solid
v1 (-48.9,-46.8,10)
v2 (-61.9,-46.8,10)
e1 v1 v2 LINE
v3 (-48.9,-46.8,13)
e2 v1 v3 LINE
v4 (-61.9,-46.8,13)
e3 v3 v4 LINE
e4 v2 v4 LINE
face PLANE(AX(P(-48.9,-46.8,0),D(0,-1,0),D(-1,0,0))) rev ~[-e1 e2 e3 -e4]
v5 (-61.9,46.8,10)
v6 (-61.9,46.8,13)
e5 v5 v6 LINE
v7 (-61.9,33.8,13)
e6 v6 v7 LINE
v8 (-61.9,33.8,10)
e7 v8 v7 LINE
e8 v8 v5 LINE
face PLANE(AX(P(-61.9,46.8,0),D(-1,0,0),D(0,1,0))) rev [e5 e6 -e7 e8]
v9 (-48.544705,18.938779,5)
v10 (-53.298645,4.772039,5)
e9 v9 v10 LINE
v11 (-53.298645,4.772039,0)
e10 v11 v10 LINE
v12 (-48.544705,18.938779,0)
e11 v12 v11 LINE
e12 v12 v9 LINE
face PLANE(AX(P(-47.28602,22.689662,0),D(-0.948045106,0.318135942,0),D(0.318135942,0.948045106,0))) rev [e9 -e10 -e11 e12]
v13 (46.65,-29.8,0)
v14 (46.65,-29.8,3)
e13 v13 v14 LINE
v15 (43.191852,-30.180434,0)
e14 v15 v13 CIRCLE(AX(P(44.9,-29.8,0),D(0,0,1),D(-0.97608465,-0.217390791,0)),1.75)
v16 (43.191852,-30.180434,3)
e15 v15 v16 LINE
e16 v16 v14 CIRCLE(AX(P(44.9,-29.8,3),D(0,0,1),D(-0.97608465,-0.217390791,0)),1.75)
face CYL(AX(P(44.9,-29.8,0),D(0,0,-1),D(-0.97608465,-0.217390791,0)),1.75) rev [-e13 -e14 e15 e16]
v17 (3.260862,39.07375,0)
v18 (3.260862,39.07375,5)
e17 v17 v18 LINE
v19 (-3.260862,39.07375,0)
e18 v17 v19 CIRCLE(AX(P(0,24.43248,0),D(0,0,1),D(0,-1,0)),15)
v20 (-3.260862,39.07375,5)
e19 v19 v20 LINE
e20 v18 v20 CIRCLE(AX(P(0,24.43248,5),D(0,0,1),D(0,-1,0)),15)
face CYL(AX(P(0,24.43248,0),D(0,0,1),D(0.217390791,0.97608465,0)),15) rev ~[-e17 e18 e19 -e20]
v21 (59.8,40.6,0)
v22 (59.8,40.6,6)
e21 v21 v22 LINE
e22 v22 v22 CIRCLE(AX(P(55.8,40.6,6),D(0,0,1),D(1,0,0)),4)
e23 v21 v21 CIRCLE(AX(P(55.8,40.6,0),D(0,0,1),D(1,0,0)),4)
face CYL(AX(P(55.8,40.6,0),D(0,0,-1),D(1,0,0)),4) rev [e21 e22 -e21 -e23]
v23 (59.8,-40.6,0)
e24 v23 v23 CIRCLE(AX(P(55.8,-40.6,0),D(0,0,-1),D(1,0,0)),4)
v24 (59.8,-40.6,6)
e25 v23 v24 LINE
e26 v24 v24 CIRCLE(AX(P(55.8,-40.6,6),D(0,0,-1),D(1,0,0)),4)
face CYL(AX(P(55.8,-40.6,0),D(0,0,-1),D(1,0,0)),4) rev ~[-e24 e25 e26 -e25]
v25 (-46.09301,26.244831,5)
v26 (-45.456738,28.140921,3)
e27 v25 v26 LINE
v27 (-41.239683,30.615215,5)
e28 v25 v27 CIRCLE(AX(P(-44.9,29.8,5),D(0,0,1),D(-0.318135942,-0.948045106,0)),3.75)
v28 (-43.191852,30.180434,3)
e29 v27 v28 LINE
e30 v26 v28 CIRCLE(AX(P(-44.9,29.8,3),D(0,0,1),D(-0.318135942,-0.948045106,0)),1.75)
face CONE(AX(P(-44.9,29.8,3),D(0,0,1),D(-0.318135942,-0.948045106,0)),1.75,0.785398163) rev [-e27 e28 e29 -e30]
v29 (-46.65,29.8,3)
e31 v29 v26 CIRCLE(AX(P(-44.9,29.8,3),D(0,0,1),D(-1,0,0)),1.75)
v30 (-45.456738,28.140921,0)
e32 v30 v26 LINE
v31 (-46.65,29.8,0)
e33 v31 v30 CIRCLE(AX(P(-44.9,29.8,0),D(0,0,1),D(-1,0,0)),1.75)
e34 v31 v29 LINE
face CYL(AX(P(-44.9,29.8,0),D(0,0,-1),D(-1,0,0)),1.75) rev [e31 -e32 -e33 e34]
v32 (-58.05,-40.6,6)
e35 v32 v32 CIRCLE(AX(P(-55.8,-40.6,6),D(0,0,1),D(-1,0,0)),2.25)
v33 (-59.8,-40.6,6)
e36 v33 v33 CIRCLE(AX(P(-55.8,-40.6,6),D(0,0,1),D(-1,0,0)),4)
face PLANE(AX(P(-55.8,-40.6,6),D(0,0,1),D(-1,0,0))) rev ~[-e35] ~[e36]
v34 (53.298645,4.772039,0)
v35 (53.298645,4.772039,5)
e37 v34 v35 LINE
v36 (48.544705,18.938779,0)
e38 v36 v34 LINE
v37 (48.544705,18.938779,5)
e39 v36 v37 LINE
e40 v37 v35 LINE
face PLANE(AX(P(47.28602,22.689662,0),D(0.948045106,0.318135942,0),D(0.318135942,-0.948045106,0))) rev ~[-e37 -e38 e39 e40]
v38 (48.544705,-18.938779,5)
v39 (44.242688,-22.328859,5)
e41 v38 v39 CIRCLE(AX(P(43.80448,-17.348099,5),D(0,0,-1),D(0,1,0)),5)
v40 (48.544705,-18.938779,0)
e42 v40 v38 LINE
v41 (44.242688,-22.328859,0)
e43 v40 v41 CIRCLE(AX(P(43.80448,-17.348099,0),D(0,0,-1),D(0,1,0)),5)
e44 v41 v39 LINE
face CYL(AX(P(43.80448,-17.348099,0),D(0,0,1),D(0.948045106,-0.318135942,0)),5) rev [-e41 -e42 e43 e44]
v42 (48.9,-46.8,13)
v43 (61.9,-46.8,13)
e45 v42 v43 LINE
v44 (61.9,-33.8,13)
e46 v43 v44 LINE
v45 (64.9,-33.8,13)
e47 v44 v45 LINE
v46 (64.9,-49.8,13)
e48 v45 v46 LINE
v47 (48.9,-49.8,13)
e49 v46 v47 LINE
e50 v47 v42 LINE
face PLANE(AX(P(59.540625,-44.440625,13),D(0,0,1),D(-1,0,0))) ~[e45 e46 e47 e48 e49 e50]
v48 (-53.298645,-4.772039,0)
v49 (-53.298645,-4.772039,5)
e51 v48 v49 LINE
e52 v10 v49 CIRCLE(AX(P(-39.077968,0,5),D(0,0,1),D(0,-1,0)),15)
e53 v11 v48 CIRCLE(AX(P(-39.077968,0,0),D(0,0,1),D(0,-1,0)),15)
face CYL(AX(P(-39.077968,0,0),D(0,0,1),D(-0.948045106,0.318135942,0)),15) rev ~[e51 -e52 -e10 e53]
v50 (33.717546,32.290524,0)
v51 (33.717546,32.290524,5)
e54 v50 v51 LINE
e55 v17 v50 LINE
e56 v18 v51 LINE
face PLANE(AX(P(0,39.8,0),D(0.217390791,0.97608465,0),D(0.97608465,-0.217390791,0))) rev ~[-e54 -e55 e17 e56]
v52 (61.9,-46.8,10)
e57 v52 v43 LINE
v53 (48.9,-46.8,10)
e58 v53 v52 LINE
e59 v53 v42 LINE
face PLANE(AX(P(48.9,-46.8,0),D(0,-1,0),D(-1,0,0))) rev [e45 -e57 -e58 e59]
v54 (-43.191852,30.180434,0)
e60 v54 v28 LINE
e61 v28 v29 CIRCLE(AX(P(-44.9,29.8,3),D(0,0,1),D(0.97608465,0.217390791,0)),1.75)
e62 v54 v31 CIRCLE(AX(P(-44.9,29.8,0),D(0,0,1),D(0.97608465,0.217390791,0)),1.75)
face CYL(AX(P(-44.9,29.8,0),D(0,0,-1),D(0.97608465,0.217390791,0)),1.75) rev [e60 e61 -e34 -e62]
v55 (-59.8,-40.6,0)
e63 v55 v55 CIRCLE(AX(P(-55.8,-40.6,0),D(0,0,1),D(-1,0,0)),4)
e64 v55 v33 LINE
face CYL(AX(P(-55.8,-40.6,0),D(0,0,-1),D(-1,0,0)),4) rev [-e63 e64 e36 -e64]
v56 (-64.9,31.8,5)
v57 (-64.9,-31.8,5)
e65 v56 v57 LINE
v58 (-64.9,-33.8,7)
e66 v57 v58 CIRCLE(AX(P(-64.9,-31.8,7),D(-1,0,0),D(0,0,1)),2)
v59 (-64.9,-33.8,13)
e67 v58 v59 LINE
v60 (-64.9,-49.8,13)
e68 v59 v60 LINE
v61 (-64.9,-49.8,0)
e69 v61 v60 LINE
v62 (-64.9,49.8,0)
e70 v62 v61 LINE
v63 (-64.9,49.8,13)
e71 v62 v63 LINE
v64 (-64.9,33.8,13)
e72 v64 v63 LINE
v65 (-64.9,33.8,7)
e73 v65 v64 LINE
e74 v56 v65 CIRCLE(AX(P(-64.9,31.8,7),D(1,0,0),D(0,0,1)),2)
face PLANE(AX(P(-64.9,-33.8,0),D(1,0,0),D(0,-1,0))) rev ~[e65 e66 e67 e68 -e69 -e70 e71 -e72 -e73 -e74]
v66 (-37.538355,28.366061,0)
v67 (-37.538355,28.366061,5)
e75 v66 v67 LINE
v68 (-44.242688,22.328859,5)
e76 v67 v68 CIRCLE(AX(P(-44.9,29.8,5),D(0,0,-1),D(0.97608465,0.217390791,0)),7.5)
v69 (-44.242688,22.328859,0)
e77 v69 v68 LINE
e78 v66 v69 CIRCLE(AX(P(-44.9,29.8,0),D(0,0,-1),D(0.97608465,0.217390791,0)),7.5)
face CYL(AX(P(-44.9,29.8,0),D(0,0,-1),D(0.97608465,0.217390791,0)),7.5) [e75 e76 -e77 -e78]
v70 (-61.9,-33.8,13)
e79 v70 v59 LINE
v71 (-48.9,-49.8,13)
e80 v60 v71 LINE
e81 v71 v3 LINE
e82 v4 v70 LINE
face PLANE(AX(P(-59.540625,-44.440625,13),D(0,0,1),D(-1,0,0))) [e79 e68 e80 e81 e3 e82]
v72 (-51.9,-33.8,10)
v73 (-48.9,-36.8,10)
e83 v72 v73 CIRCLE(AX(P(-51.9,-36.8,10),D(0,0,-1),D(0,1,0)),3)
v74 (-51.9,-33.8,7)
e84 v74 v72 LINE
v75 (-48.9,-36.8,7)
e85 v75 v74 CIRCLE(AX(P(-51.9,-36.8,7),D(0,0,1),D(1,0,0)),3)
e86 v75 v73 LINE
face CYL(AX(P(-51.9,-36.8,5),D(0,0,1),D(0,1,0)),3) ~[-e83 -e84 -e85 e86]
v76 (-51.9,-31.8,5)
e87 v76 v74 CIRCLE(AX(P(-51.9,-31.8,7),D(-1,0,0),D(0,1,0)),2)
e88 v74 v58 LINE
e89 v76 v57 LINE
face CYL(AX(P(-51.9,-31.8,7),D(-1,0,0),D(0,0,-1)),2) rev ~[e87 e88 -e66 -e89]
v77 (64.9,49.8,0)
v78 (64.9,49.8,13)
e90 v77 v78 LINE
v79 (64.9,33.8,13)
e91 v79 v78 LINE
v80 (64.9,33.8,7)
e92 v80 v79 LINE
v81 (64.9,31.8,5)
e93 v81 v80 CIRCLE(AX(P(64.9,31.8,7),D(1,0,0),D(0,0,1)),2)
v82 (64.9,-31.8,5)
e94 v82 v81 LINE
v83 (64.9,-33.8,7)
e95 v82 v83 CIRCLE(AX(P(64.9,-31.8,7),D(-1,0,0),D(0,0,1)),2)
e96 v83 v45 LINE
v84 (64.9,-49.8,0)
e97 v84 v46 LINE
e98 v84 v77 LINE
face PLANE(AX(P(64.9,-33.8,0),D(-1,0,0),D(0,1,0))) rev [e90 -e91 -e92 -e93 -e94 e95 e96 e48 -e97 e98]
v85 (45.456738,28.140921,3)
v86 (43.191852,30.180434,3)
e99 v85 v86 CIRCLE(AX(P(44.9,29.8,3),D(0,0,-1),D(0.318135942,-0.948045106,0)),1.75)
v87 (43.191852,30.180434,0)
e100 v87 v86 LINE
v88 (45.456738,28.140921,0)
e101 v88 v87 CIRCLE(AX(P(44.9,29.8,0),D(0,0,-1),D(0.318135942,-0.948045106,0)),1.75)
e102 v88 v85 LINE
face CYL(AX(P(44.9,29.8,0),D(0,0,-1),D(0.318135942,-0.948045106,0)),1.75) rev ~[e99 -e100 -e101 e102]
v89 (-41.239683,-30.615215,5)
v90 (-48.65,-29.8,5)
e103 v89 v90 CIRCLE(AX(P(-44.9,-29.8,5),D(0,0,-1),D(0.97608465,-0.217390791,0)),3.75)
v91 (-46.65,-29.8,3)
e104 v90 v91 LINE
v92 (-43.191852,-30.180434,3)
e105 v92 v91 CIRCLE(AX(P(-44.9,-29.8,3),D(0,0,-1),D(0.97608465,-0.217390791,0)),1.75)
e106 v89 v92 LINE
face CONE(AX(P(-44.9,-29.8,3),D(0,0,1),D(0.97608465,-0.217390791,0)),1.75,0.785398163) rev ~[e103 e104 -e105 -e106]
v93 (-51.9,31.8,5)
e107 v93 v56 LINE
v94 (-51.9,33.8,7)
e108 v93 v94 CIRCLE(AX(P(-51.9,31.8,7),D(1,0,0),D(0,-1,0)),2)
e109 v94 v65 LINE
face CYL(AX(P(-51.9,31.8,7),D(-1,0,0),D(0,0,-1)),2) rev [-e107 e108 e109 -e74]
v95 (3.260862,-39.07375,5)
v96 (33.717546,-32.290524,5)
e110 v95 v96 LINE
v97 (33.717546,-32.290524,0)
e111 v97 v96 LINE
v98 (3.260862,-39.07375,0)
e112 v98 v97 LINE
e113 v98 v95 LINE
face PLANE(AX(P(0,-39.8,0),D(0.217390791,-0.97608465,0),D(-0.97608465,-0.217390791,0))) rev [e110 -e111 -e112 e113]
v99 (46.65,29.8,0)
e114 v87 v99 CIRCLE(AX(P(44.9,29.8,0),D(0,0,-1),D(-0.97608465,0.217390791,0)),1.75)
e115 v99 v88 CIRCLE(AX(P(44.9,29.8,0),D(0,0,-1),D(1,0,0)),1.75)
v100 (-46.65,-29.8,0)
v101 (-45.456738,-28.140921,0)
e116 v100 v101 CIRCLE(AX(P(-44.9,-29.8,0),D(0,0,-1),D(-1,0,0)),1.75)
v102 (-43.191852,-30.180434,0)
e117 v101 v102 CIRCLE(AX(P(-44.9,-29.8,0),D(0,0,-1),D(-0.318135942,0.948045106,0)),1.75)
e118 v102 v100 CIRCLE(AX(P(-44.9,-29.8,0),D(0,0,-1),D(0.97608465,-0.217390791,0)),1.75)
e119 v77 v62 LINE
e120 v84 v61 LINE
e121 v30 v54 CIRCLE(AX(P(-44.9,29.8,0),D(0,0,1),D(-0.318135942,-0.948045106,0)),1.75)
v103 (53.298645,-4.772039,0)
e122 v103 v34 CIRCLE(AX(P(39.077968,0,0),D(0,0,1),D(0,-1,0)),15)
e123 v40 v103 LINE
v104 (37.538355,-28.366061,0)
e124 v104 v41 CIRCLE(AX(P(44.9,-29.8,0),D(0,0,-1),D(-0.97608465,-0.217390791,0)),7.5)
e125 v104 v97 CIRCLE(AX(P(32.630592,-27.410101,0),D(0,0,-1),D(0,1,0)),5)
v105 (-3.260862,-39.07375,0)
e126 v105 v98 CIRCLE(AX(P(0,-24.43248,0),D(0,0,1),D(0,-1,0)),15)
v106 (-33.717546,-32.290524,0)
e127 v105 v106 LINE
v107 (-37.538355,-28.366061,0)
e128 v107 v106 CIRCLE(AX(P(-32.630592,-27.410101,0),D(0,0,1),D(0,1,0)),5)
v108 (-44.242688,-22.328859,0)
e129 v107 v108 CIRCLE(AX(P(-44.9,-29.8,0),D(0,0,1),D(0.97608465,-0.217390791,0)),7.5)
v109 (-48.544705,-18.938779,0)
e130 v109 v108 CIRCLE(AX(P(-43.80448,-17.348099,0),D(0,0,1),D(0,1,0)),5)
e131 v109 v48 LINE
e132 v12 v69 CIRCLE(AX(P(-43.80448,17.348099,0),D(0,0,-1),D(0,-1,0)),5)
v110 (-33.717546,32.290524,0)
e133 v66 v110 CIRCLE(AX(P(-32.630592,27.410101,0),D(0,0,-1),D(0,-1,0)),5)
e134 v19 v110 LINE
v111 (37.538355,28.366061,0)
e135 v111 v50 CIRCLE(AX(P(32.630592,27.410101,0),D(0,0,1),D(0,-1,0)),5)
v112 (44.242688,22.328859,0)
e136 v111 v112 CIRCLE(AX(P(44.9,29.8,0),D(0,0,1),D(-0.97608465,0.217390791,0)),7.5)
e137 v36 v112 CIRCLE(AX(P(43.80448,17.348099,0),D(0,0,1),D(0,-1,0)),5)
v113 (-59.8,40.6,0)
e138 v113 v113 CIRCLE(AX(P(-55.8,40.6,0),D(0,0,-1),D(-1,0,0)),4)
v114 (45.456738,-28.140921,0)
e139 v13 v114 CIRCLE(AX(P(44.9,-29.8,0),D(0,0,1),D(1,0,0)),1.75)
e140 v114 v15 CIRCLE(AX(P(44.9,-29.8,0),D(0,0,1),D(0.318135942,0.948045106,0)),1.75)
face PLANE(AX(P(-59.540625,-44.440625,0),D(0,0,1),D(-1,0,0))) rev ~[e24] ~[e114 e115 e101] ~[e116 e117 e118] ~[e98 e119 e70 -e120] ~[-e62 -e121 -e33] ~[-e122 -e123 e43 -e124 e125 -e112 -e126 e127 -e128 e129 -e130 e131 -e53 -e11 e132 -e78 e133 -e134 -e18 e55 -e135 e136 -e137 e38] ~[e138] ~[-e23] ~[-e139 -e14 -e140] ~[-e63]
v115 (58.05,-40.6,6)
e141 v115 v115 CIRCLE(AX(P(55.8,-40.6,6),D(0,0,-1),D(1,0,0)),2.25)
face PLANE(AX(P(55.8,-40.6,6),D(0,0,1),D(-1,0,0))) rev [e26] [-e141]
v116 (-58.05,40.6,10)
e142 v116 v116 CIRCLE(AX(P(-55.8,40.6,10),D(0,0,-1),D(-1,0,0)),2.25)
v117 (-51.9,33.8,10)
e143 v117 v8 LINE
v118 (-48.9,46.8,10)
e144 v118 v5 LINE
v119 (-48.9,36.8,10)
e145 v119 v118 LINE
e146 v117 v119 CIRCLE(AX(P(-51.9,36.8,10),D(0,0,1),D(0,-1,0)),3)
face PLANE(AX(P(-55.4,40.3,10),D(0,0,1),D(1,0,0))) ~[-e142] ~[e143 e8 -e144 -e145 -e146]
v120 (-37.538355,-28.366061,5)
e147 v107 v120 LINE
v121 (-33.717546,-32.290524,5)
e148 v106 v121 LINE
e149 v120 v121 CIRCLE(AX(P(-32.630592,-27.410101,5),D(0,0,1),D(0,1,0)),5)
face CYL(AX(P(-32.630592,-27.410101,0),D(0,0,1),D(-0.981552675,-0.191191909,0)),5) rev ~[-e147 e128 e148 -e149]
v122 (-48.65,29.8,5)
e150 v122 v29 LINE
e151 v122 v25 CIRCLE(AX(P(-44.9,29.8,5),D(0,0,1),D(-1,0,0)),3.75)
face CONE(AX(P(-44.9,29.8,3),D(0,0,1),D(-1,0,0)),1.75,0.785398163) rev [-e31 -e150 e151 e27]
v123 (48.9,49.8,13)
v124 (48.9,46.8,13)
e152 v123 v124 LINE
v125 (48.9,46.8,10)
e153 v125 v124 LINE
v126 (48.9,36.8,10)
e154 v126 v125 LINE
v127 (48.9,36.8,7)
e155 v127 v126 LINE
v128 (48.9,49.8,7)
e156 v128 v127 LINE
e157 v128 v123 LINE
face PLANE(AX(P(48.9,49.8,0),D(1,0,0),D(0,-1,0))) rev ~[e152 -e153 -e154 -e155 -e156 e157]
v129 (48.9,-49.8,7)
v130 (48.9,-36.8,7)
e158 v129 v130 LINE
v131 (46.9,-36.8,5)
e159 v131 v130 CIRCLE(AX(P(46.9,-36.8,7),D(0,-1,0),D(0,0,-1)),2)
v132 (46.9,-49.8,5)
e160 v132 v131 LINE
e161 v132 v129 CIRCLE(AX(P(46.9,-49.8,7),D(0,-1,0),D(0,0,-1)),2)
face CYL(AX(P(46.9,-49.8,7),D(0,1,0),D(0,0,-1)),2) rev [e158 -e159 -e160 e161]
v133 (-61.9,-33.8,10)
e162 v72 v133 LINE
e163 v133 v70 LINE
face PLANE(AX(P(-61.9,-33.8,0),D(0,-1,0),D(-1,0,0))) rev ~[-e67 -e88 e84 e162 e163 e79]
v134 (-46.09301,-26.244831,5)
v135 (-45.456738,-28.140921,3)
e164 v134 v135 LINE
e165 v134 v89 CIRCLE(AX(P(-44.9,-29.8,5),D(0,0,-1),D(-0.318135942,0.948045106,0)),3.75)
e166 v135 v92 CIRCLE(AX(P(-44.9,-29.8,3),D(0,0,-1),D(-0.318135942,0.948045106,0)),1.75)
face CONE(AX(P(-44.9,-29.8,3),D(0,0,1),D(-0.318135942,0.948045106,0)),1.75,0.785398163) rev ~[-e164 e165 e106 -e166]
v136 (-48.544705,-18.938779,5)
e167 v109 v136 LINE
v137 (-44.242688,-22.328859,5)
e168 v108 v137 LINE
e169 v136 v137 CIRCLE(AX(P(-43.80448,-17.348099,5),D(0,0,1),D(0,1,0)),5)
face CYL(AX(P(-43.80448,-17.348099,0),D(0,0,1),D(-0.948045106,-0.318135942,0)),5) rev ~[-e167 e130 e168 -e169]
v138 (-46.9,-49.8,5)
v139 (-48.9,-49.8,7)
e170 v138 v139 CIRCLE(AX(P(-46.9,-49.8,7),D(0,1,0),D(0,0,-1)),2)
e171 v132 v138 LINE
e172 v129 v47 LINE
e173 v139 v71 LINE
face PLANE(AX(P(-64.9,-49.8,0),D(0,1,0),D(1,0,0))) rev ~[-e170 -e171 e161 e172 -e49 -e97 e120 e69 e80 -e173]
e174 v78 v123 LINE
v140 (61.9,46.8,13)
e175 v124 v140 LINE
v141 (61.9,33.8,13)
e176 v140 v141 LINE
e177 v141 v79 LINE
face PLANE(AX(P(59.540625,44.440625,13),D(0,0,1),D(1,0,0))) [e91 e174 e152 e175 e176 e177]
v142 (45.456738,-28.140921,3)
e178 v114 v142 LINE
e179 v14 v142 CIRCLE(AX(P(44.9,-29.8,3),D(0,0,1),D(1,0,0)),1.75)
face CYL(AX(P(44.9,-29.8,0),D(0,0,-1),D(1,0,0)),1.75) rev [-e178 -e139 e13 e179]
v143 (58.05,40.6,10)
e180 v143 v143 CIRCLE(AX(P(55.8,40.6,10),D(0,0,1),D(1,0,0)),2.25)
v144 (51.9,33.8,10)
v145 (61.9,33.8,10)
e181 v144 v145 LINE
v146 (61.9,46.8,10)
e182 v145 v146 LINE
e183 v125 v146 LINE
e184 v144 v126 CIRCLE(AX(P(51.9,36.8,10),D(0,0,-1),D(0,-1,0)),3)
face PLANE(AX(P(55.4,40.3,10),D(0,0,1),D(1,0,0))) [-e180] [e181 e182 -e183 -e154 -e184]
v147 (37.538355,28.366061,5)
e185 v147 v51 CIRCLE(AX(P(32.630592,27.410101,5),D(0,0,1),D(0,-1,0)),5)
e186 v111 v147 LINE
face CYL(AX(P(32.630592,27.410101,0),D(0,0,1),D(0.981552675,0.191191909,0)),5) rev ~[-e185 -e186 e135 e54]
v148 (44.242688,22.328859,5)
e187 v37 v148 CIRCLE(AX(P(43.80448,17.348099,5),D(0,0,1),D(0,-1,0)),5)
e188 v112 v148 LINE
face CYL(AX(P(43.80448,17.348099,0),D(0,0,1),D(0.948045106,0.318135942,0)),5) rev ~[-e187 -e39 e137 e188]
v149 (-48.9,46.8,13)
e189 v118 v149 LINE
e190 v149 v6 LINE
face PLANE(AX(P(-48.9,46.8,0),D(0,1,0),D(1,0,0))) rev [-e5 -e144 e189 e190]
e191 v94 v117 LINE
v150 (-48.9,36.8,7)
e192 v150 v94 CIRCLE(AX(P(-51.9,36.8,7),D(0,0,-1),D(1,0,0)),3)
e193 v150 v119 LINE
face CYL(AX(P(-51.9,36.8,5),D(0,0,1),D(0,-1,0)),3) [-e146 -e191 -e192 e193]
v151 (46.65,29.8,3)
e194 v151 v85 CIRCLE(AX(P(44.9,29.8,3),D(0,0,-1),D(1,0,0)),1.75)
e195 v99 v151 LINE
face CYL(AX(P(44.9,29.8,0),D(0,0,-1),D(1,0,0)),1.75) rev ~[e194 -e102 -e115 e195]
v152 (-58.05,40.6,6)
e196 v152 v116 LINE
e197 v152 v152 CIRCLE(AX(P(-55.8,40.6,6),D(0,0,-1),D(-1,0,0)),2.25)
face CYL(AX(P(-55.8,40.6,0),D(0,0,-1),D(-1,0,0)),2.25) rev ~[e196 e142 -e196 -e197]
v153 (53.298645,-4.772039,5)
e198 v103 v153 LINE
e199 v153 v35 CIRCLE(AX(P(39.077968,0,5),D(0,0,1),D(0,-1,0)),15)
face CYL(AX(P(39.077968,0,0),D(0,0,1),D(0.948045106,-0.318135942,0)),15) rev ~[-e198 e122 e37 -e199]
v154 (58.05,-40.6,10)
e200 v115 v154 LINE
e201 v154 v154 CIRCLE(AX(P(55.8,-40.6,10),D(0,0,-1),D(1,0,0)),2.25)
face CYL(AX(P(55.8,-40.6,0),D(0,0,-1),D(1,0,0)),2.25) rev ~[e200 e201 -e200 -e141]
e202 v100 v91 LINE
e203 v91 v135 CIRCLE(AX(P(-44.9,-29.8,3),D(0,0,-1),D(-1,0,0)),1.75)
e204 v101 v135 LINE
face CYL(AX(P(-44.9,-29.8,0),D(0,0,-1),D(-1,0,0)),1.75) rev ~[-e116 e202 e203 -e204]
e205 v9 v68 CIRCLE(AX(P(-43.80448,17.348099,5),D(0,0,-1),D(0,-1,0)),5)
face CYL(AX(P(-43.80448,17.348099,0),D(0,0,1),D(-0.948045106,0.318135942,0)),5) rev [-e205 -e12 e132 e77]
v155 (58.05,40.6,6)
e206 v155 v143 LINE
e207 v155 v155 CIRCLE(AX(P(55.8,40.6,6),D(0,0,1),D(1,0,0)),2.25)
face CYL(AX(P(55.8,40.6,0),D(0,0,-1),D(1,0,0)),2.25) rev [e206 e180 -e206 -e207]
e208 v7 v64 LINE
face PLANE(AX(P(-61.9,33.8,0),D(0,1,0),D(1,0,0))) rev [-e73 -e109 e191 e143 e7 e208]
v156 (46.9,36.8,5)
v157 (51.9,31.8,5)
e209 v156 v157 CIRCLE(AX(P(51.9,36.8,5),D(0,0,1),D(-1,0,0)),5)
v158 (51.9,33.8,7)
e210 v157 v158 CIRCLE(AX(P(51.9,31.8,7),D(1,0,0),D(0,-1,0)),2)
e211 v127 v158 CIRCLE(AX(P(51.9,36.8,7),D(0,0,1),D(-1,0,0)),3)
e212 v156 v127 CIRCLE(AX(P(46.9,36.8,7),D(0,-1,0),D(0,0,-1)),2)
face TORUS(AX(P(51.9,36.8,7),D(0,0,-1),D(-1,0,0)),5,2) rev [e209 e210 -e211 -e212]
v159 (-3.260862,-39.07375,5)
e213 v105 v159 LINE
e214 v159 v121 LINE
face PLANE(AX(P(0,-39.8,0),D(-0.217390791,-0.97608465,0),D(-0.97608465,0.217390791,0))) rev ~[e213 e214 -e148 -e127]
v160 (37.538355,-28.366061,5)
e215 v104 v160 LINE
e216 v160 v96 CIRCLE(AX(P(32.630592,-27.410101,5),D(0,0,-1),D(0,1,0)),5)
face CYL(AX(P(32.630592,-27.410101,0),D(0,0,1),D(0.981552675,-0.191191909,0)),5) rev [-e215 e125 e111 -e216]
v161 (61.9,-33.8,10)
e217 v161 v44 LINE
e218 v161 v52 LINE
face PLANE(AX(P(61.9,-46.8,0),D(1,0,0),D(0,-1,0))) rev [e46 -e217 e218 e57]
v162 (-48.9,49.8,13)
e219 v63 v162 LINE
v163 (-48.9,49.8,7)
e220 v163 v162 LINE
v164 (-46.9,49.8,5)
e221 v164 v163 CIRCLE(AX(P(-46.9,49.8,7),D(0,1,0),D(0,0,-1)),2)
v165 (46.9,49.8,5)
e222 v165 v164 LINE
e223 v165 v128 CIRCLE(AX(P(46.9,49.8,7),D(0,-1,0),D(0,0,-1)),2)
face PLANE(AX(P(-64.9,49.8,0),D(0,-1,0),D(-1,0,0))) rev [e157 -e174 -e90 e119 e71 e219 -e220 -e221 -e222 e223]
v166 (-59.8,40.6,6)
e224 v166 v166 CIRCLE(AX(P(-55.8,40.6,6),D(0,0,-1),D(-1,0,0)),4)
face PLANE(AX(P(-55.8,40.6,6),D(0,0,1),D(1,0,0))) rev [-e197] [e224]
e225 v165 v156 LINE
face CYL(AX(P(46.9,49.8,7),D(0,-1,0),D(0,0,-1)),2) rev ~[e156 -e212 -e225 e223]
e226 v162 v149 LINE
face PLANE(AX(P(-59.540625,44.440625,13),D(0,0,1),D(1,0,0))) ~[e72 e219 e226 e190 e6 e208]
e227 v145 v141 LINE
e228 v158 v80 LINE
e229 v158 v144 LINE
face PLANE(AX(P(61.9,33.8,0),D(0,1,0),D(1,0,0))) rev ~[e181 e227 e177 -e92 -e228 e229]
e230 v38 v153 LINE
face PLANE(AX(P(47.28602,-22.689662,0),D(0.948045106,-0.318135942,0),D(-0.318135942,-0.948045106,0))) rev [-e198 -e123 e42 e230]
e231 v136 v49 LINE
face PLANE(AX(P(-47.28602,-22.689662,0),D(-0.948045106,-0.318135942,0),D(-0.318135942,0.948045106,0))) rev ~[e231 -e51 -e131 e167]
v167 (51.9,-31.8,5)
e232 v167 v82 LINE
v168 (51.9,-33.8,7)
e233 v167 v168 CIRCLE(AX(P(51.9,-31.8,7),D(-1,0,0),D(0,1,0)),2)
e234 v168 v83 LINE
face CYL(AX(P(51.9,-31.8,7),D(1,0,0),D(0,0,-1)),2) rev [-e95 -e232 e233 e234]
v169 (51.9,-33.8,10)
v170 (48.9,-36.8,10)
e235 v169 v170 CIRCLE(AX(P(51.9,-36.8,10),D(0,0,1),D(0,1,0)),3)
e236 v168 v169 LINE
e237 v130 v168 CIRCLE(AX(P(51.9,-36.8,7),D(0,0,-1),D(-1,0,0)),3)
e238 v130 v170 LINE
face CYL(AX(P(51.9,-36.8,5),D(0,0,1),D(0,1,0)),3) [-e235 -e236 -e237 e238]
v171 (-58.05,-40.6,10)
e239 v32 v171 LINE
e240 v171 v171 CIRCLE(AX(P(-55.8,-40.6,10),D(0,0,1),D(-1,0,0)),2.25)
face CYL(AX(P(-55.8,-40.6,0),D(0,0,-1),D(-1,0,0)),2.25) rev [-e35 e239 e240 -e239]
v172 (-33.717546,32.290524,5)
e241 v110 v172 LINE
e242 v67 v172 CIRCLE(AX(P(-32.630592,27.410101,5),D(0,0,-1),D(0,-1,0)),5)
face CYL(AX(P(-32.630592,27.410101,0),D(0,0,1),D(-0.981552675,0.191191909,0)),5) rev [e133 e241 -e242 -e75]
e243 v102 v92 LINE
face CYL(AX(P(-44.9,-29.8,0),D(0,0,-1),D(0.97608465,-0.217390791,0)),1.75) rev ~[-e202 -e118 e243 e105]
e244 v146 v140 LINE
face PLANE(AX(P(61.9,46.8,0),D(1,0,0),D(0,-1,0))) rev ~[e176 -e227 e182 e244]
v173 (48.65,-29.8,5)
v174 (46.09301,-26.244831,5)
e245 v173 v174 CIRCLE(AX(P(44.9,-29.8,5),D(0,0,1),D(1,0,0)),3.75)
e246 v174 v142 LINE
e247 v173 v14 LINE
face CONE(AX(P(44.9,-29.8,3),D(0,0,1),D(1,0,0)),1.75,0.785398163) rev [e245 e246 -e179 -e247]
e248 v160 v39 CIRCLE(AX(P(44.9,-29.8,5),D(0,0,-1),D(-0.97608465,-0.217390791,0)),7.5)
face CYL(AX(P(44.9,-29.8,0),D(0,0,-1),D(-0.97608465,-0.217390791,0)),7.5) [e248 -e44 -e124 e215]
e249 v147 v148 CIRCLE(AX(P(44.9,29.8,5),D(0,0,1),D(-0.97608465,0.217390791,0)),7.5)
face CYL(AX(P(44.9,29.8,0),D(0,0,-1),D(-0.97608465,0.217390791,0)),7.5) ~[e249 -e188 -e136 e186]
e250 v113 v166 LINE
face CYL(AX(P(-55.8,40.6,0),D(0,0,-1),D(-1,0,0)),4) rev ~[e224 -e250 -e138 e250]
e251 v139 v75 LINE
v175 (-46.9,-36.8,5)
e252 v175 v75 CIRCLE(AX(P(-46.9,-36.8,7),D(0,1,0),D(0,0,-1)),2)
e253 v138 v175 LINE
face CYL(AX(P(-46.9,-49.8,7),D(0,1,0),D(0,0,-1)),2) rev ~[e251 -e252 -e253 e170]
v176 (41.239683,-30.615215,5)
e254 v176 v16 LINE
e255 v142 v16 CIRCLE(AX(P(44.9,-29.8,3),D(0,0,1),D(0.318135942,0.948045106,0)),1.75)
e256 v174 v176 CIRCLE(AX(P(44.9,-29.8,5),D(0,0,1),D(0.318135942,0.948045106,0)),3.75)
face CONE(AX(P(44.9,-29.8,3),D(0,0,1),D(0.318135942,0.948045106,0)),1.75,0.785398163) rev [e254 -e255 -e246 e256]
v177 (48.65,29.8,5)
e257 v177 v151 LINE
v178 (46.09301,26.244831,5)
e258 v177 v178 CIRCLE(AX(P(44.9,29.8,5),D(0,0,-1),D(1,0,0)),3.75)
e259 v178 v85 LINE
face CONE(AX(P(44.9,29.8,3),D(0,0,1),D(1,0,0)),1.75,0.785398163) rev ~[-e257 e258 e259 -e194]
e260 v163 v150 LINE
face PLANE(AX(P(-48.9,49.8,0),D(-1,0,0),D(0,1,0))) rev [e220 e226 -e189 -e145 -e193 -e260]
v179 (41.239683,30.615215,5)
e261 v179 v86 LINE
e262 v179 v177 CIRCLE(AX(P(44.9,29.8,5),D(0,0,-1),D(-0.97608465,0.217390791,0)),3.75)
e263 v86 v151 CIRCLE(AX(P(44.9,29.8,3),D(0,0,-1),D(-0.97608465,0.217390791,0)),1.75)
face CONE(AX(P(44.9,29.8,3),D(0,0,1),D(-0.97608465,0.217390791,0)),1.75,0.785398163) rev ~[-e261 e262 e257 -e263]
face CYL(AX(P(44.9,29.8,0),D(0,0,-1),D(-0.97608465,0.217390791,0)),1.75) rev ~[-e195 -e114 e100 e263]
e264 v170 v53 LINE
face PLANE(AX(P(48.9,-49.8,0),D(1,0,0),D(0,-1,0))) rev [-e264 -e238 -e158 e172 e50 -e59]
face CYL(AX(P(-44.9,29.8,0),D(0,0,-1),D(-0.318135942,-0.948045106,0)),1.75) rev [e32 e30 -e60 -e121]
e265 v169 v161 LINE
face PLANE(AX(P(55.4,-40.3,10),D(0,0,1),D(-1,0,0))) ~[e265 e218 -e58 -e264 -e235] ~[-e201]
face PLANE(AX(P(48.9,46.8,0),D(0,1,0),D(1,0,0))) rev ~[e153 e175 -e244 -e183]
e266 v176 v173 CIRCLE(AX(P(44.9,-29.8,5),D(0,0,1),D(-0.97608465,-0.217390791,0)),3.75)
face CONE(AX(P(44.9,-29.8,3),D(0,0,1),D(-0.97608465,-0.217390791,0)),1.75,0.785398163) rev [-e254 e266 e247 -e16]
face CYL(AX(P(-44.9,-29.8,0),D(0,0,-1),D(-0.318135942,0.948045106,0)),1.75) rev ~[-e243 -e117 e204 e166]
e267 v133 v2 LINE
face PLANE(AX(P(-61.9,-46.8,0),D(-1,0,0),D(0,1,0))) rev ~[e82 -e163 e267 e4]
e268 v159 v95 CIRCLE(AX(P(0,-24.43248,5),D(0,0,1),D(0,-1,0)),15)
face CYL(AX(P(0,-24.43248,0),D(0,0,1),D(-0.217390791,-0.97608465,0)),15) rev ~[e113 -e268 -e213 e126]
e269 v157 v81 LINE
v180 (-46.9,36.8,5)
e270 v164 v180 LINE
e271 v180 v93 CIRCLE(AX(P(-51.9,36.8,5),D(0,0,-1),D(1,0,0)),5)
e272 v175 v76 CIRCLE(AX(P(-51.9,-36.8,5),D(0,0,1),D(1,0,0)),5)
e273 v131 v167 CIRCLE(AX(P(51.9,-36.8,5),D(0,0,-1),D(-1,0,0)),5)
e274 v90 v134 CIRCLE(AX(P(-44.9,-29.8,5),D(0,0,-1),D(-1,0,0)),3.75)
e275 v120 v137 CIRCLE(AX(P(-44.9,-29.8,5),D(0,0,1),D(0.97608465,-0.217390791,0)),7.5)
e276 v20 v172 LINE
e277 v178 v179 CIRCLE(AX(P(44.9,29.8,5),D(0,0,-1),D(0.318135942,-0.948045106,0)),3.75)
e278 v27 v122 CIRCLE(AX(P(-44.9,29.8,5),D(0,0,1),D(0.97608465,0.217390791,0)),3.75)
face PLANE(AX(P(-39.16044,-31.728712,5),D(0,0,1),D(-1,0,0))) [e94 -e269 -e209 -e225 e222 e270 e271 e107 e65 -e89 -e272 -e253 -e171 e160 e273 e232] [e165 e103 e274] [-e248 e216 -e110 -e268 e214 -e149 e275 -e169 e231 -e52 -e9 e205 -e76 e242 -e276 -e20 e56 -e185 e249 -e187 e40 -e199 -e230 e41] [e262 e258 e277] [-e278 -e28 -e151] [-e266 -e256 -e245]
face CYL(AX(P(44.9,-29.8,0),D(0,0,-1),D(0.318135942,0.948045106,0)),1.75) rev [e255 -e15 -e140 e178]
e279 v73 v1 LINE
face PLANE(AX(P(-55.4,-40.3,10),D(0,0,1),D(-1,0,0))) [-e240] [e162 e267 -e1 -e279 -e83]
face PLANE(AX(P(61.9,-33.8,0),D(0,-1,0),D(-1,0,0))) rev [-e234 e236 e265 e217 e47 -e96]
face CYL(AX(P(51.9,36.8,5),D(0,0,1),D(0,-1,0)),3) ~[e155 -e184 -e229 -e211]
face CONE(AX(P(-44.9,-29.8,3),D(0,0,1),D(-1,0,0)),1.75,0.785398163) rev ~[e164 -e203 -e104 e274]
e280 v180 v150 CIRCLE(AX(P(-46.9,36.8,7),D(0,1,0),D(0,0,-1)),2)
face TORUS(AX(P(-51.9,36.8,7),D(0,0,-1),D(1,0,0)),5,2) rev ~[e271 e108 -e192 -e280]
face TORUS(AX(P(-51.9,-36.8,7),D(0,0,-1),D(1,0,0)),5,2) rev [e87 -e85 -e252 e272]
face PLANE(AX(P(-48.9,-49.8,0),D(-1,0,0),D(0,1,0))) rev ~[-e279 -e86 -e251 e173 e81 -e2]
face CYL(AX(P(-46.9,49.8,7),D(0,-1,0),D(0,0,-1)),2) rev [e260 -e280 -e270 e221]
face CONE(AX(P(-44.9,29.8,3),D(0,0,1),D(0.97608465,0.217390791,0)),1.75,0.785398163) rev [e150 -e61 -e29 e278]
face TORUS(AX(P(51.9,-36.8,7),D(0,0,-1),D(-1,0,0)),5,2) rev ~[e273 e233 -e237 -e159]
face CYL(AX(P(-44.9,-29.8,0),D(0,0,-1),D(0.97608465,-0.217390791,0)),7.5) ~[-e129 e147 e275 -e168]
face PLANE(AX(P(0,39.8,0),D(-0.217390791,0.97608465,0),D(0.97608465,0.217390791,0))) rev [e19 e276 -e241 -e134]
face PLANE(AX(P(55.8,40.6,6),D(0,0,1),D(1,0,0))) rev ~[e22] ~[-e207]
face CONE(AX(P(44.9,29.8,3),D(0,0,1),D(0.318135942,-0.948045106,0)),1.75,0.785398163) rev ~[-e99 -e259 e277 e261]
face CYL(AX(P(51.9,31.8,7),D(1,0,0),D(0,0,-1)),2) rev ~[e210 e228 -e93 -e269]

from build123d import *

# Parameters (mm, degrees)
F1_DEPTH = 5
F0_W     = 13
F0_H     = 13
F0_R     = 4
F0_R_2   = 2.25
F2_DEPTH = 10
F3_DEPTH = 13
F4_DEPTH = 6
F5_SIZE  = 2
F6_R     = 3
F7_R     = 2
F8_R     = 5
F11_R    = 15


with BuildPart() as f1:
    # F0 (on Top) → F1 (new body)
    with BuildSketch(Plane.XY):
        with BuildLine():
            ThreePointArc((43.1918518623, 30.1804338837), (45.0913645201, 31.5395055678), (46.65, 29.8))
            ThreePointArc((46.65, 29.8), (46.3207025236, 28.7781857608), (45.4567378977, 28.1409210648))
            Line((45.4567378977, 28.1409210648), (47.2860195617, 22.6896617063))
            Line((47.2860195617, 22.6896617063), (54.9, 0))
            Line((54.9, 0), (64.9, 0))
            Line((64.9, 0), (64.9, 33.8))
            Line((64.9, 33.8), (61.9, 33.8))
            Line((61.9, 33.8), (48.9, 33.8))
            Line((48.9, 33.8), (48.9, 46.8))
            Line((48.9, 46.8), (48.9, 49.8))
            Line((48.9, 49.8), (0, 49.8))
            Line((0, 49.8), (0, 39.8))
            Line((0, 39.8), (37.5793651244, 31.43043093))
            Line((37.5793651244, 31.43043093), (43.1918518623, 30.1804338837))
        make_face()
        with BuildLine():
            ThreePointArc((45.4567378977, 28.1409210648), (43.7289579343, 28.499553738), (43.1918518623, 30.1804338837))
            Line((43.1918518623, 30.1804338837), (37.5793651244, 31.43043093))
            ThreePointArc((37.5793651244, 31.43043093), (39.8812482897, 24.2266588773), (47.2860195617, 22.6896617063))
            Line((47.2860195617, 22.6896617063), (45.4567378977, 28.1409210648))
        make_face()
    extrude(amount=F1_DEPTH)

    # F0 (on Top) → F2 (join)
    with BuildSketch(Plane.XY):
        with Locations((55.4, 40.3)):
            Rectangle(F0_W, F0_H)
        with Locations((55.8, 40.6)):
            Circle(F0_R, mode=Mode.SUBTRACT)
        with Locations((55.8, 40.6)):
            Circle(F0_R)
        with Locations((55.8, 40.6)):
            Circle(F0_R_2, mode=Mode.SUBTRACT)
    extrude(amount=F2_DEPTH)

    # F0 (on Top) → F3 (join)
    with BuildSketch(Plane.XY):
        Polygon((64.9, 49.8), (48.9, 49.8), (48.9, 46.8), (61.9, 46.8), (61.9, 33.8), (64.9, 33.8), align=None)
    extrude(amount=F3_DEPTH)

    # F0 (on Top) → F4 (cut)
    with BuildSketch(Plane.XY):
        with Locations((55.8, 40.6)):
            Circle(F0_R)
        with Locations((55.8, 40.6)):
            Circle(F0_R_2, mode=Mode.SUBTRACT)
    extrude(amount=F4_DEPTH, mode=Mode.SUBTRACT)

    # F5
    f5_edges = [f1.edges().sort_by_distance(p)[0] for p in [
        (43.15, 29.8, 5),
    ]]
    chamfer(f5_edges, length=F5_SIZE)

    # F6
    f6_edges = [f1.edges().sort_by_distance(p)[0] for p in [
        (48.9, 33.8, 7.5),
    ]]
    fillet(f6_edges, radius=F6_R)

    # F7
    f7_edges = [f1.edges().sort_by_distance(p)[0] for p in [
        (58.4, 33.8, 5),
        (49.77868, 34.67868, 5),
        (48.9, 43.3, 5),
    ]]
    fillet(f7_edges, radius=F7_R)

    # F8
    f8_edges = [f1.edges().sort_by_distance(p)[0] for p in [
        (37.579365, 31.430431, 2.5),
        (47.28602, 22.689662, 2.5),
    ]]
    fillet(f8_edges, radius=F8_R)

    # F9: F1 across face


with BuildPart() as f1_1:
    add(f1.part)
    add(f1.part.mirror(Plane(origin=(0, 44.8, 2.5), x_dir=(0, -1, 0), z_dir=(-1, 0, 0))))

    # F10: F1 across face


with BuildPart() as f1_2:
    add(f1_1.part)
    add(f1_1.part.mirror(Plane(origin=(59.9, 0, 2.5), x_dir=(1, 0, 0), z_dir=(0, -1, 0))))

    # F11
    f11_edges = [f1_2.edges().sort_by_distance(p)[0] for p in [
        (0, 39.8, 2.5),
        (54.9, 0, 2.5),
        (0, -39.8, 2.5),
        (-54.9, 0, 2.5),
    ]]
    fillet(f11_edges, radius=F11_R)


solid = f1_2.part
